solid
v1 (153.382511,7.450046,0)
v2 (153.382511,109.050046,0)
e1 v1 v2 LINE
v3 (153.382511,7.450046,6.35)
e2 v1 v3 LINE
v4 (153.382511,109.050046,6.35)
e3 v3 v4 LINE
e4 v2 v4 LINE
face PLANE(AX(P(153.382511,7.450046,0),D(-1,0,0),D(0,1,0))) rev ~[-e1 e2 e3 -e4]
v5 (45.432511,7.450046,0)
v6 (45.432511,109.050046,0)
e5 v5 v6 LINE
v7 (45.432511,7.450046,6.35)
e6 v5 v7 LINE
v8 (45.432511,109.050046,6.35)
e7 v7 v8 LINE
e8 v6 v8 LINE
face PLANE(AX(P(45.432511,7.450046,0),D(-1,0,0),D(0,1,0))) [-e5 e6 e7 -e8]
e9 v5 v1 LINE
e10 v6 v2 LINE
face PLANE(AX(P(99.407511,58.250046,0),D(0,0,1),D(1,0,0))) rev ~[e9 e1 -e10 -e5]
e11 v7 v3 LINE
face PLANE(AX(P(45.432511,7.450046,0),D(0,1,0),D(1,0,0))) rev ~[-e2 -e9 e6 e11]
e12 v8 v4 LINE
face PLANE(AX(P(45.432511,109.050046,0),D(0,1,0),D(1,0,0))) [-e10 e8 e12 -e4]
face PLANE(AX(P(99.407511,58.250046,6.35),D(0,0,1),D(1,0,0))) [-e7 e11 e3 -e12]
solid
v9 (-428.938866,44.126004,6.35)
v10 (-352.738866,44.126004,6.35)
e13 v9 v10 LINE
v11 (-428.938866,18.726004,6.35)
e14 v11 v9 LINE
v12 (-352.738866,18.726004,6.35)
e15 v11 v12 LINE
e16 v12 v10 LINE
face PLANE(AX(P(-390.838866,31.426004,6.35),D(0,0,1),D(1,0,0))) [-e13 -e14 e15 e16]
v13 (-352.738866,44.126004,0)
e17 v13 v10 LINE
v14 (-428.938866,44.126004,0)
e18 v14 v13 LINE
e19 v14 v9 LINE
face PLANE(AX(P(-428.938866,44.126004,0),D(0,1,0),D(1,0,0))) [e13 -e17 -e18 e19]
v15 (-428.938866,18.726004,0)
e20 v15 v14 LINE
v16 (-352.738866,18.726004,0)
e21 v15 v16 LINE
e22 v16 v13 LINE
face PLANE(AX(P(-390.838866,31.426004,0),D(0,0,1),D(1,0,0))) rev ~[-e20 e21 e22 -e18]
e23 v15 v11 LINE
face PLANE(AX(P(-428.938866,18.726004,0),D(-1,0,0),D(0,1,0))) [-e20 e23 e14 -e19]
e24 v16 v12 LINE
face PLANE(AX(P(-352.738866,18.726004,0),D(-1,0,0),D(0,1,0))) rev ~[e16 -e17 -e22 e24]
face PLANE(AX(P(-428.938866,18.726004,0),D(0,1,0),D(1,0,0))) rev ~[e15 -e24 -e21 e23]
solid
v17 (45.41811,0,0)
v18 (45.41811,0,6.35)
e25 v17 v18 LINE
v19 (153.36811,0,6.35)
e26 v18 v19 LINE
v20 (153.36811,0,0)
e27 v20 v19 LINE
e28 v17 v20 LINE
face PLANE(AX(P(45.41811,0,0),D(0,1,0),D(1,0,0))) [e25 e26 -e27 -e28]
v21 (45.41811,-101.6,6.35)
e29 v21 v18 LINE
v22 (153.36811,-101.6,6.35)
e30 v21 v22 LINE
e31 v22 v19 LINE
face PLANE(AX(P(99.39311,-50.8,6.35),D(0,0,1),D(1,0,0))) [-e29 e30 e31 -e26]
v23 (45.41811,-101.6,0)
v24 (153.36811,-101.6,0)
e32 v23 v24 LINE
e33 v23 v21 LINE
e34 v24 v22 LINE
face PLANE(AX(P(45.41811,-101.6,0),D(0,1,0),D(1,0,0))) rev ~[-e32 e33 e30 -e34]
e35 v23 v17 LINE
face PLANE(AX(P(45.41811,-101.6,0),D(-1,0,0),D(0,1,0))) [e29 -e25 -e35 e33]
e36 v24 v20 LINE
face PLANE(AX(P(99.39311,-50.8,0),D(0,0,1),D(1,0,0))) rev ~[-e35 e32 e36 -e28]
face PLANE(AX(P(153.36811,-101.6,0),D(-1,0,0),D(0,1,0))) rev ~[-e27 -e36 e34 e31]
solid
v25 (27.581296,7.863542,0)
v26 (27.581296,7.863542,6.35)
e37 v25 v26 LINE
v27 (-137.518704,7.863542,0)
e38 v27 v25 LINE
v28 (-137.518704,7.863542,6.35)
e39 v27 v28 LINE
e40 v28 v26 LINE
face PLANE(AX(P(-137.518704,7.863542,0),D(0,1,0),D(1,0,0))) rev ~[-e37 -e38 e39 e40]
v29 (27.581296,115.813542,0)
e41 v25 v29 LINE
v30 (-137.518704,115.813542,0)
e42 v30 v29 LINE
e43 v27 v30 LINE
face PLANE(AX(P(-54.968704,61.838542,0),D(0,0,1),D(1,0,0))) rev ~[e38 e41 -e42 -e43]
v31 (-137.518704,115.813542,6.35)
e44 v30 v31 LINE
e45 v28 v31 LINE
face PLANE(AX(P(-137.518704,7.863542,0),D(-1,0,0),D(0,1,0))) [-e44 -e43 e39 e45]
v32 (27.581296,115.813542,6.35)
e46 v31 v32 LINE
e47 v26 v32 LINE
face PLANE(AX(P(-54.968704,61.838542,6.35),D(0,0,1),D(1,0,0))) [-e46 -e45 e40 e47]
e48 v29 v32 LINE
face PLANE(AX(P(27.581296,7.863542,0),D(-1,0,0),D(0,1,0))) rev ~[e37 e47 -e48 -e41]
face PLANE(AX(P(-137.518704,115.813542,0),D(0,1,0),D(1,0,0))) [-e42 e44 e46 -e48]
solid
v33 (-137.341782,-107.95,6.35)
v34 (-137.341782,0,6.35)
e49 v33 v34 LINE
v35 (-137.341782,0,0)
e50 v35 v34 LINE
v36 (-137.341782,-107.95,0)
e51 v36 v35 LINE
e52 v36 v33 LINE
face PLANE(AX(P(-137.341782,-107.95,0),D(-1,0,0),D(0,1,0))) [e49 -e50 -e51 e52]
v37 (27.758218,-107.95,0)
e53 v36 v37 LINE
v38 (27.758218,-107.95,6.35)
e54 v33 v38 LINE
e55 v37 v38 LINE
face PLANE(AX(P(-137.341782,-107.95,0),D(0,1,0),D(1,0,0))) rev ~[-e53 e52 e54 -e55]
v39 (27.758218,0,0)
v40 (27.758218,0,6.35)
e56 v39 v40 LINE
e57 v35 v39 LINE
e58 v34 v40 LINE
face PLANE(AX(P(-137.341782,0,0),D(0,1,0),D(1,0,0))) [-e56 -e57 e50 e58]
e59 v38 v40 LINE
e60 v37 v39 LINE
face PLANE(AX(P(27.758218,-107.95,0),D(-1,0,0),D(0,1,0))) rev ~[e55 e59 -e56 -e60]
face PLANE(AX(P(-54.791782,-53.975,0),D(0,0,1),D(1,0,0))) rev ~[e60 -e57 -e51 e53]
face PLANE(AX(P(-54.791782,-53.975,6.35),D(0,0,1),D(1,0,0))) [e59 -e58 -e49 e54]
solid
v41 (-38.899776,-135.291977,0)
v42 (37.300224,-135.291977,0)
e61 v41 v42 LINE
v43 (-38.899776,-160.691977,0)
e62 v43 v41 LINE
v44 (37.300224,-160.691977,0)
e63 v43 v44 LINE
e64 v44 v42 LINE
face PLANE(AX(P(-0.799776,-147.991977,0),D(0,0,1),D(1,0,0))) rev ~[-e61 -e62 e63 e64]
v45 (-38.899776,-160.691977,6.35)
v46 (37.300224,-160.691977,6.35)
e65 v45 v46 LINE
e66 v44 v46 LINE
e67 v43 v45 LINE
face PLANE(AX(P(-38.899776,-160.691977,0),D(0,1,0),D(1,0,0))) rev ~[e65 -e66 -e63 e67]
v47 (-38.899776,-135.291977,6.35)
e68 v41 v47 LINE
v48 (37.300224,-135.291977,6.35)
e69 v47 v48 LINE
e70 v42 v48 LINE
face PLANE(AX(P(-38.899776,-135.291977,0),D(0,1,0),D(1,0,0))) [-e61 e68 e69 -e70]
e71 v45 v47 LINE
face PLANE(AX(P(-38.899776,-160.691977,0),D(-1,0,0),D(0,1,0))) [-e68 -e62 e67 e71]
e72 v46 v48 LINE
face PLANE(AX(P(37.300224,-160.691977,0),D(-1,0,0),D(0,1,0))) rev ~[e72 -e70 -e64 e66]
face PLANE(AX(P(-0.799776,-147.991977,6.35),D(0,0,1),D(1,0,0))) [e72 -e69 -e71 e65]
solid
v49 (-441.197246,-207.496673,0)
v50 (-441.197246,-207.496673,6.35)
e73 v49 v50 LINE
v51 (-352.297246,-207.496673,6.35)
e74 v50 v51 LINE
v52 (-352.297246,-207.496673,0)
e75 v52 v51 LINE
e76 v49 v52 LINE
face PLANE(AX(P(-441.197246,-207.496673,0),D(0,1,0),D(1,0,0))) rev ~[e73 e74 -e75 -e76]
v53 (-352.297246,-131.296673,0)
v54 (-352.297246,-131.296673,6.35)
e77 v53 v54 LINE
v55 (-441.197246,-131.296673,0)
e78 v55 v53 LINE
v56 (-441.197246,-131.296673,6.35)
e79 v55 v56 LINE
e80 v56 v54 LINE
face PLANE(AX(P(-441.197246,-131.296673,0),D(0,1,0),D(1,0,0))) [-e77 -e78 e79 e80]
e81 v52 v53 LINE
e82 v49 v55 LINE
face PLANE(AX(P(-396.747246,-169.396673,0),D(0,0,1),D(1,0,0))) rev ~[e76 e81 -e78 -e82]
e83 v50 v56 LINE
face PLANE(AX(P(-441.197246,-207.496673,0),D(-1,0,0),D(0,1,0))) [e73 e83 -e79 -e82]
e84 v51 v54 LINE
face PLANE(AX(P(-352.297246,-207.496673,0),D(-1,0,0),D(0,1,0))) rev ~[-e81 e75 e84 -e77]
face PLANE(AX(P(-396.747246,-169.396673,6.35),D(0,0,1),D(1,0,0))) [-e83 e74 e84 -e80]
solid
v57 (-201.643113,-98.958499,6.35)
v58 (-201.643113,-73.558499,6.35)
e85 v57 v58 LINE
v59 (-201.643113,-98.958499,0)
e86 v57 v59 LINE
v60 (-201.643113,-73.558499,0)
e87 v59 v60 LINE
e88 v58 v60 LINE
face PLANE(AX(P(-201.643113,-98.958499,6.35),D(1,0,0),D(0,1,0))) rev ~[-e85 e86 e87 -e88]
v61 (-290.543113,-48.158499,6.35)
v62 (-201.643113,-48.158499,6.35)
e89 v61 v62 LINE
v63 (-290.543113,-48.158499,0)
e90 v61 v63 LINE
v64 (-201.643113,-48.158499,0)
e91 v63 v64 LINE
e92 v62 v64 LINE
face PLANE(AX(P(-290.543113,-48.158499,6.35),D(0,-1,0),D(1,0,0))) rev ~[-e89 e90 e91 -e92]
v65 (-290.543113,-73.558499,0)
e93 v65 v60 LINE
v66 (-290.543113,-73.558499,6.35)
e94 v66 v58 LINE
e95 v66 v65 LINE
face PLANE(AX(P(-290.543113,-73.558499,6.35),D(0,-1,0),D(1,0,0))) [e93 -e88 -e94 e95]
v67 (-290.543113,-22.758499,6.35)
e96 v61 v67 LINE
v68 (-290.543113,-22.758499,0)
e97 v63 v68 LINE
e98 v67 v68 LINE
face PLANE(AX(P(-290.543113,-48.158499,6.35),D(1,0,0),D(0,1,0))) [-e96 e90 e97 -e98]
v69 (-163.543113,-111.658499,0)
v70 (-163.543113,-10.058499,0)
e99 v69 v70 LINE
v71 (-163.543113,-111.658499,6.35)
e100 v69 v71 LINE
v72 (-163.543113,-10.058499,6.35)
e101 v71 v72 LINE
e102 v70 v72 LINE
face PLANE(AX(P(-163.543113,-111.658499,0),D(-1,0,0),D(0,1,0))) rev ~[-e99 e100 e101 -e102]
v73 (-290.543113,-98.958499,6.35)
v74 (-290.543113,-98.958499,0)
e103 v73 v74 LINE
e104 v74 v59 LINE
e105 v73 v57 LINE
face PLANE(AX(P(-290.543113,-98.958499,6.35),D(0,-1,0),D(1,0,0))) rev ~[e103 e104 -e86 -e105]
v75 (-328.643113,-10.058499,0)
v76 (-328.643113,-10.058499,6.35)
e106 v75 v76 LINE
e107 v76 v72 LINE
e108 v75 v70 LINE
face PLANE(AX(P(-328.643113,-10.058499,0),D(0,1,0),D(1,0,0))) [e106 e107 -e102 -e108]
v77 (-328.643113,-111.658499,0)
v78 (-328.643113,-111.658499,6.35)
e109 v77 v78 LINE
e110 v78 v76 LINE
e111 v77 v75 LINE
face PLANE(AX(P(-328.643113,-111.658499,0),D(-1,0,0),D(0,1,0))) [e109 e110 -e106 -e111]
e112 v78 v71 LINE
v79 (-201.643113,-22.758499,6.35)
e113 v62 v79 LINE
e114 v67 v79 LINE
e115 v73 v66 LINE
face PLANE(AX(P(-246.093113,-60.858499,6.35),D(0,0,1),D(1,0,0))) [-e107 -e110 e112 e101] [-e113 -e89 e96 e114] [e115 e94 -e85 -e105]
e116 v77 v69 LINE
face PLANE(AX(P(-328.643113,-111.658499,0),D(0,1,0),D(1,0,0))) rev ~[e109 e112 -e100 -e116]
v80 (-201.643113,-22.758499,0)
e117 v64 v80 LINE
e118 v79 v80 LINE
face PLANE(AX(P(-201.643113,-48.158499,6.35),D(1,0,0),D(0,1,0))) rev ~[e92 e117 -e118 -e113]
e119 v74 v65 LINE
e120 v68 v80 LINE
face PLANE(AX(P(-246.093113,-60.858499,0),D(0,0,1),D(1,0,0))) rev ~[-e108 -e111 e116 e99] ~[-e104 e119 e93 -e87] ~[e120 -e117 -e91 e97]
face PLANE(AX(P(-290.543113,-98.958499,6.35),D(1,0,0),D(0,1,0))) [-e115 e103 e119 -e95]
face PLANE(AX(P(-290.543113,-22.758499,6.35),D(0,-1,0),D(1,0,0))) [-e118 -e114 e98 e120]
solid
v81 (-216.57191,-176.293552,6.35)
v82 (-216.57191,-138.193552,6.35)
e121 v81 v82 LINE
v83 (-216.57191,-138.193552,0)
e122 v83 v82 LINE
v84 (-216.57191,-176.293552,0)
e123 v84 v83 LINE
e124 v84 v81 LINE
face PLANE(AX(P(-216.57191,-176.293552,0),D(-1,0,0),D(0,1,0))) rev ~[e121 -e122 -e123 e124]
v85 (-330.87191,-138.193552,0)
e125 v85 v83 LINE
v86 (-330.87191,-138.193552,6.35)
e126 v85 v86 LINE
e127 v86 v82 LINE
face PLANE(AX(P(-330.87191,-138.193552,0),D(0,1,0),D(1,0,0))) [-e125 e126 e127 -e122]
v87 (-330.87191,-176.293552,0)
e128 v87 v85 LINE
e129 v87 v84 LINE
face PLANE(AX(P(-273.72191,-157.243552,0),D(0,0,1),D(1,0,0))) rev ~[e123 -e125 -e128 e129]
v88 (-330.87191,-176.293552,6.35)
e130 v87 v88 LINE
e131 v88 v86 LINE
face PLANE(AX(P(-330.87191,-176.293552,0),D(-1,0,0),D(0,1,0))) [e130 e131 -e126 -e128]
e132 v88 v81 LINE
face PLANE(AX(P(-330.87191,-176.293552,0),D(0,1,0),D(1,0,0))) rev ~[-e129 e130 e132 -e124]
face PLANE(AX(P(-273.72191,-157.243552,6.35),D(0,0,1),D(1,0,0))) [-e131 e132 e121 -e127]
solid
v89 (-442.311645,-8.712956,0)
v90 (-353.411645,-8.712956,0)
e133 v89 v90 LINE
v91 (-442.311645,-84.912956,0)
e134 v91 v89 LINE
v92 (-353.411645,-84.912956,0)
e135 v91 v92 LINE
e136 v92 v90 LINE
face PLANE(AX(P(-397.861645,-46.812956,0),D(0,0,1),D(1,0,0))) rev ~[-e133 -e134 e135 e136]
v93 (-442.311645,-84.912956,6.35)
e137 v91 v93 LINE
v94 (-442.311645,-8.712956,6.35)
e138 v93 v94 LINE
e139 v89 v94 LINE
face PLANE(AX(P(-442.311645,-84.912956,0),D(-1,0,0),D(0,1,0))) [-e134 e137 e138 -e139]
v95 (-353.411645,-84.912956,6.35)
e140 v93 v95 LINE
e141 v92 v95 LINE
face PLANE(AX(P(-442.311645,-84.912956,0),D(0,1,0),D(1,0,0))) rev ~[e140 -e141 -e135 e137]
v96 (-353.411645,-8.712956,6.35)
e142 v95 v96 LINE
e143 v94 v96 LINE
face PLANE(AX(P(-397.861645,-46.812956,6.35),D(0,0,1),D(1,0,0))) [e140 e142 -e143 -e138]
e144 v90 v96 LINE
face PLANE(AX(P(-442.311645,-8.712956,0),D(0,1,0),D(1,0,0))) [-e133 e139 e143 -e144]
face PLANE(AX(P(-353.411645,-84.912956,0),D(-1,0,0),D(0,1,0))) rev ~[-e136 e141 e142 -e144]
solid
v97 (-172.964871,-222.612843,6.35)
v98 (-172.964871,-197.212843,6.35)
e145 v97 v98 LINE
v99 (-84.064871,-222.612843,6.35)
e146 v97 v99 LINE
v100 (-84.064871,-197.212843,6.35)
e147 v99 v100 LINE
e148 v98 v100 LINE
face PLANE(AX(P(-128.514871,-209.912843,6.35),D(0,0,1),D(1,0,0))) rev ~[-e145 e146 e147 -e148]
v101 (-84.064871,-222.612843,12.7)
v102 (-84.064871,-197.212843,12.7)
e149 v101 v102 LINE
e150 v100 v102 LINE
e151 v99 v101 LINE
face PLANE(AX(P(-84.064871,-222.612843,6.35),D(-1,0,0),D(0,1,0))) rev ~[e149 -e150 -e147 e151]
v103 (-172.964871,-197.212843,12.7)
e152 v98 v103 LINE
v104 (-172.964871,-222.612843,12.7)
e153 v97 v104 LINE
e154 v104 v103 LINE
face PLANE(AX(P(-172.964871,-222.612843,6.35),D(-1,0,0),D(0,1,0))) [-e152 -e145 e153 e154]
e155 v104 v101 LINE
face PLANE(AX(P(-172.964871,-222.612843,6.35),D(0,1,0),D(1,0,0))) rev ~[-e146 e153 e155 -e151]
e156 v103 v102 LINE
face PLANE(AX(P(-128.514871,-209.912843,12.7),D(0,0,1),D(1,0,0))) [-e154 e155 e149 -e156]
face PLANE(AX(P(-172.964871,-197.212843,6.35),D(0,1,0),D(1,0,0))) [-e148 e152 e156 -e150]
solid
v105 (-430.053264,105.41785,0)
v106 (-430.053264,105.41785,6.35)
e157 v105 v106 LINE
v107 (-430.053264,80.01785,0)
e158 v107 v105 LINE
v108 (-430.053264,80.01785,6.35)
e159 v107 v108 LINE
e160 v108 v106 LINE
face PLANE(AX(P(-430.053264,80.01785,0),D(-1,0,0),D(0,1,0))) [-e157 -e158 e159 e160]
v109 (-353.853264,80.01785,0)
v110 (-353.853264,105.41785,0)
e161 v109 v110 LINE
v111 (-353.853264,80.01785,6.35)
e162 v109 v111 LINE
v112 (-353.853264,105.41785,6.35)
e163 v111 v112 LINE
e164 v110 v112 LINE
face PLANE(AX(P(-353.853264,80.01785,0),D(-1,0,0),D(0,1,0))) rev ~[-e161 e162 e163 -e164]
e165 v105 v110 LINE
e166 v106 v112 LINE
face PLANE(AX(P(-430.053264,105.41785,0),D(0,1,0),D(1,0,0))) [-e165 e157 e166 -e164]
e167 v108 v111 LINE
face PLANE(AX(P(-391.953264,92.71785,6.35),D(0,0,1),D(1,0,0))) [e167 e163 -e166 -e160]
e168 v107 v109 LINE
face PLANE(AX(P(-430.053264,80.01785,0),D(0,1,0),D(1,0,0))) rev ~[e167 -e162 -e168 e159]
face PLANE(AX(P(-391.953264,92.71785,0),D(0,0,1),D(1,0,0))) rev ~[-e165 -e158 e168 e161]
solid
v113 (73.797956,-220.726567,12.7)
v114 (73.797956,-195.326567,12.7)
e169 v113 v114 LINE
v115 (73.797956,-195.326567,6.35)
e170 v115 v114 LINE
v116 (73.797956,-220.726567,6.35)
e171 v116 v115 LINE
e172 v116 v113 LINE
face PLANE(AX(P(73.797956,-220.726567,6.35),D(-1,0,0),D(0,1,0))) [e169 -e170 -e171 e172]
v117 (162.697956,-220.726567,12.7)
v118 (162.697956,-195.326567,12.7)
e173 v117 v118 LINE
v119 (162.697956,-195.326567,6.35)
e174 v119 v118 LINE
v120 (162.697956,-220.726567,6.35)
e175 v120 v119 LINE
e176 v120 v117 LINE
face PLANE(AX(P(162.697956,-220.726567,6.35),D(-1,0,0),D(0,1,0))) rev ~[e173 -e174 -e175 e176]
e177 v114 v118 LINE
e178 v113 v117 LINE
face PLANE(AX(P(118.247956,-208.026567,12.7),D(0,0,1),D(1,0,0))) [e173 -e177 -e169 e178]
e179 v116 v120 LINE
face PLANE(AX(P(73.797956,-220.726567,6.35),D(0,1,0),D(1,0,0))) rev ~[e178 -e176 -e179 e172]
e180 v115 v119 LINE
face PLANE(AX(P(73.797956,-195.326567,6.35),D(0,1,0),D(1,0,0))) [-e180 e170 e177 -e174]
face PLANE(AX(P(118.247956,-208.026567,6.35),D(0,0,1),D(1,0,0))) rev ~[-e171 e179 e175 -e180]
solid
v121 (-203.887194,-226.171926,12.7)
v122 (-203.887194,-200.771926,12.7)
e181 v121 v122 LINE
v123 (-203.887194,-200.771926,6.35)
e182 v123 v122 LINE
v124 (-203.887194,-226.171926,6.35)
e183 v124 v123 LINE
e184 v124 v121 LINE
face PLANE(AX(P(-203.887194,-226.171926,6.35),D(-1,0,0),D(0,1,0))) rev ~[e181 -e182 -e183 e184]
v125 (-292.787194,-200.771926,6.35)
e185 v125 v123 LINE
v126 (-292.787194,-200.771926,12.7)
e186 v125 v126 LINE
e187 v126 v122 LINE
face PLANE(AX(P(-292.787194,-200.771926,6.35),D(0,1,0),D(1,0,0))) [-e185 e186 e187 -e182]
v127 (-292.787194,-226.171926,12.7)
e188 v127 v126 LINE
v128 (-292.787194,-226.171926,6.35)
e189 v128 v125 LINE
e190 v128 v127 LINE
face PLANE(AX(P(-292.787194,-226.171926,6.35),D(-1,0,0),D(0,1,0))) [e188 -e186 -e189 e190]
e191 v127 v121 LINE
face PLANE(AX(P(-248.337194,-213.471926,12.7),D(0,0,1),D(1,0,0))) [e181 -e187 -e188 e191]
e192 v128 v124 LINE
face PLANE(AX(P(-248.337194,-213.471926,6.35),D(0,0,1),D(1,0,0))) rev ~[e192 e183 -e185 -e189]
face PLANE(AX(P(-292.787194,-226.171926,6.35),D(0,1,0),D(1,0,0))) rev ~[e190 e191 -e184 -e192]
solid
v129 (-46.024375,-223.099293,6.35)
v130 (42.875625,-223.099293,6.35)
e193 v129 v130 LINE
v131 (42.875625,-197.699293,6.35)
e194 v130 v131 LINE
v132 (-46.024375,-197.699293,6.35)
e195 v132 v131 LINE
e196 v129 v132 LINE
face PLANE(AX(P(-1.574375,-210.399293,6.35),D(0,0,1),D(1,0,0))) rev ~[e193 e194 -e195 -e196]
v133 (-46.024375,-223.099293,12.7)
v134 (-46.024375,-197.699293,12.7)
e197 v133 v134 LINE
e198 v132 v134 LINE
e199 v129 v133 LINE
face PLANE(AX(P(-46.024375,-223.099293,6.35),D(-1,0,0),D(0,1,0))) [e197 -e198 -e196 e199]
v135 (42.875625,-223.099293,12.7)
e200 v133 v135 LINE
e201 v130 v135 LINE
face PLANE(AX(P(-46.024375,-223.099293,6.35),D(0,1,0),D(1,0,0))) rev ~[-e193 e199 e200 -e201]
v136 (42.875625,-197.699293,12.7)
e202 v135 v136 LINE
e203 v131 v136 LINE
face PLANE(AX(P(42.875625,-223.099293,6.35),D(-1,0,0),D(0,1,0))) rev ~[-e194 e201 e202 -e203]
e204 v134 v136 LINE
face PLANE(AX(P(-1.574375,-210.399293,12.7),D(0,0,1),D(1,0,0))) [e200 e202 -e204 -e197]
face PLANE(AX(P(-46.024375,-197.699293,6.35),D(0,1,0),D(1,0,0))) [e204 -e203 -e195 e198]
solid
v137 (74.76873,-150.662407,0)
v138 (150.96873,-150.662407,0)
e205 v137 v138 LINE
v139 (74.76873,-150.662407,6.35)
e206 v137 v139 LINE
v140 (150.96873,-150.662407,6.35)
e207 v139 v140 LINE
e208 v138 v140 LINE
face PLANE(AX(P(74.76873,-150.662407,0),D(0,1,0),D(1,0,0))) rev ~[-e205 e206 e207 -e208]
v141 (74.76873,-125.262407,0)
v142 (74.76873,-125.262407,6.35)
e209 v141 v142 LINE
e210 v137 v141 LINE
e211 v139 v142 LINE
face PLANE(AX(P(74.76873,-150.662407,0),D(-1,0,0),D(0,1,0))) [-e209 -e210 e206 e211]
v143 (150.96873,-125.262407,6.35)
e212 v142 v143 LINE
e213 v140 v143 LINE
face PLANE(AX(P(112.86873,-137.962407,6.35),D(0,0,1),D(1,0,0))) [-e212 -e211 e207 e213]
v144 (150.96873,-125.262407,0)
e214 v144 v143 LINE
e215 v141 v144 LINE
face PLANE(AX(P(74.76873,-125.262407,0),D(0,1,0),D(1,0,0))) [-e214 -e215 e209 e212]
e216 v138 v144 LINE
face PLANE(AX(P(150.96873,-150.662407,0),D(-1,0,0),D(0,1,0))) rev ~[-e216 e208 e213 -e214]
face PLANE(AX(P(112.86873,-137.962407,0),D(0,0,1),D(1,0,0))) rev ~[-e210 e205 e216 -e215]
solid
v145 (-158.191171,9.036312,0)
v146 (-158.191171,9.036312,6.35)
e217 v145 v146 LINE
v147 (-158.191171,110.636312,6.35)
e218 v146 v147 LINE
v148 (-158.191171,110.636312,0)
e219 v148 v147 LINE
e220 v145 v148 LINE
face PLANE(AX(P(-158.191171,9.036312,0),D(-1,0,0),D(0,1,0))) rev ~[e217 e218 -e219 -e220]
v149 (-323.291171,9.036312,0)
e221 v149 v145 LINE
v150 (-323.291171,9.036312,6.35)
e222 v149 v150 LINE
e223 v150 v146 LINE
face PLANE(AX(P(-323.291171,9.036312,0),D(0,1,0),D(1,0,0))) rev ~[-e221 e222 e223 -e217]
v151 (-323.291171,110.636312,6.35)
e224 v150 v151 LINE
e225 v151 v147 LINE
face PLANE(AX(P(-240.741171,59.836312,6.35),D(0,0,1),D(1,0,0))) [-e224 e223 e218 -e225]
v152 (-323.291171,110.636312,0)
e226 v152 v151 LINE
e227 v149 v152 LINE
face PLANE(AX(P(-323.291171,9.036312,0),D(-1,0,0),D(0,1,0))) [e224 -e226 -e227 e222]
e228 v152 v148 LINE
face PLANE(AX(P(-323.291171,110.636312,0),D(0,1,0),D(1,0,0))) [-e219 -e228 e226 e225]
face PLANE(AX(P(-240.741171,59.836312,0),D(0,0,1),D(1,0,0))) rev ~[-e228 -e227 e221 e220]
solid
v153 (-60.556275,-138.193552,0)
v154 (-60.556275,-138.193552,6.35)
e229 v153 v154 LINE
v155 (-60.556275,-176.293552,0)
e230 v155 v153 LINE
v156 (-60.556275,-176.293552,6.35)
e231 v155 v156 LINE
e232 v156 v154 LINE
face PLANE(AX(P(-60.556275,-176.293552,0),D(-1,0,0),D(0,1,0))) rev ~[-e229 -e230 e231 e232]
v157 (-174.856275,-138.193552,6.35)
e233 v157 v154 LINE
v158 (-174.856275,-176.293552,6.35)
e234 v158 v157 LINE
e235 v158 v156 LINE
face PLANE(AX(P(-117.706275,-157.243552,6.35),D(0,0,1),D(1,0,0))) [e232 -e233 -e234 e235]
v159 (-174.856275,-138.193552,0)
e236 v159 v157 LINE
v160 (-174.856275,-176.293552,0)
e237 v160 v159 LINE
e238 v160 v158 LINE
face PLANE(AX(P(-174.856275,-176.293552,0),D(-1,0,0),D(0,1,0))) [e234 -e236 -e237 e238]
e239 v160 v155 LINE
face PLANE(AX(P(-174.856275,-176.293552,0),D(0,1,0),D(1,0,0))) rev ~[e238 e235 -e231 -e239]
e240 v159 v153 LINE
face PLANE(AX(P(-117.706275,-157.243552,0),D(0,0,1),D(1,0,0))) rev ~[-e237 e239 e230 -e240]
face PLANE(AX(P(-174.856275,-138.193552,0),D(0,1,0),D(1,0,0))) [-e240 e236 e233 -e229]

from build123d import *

# Parameters (mm, degrees)
F1_W      = 165.1
F1_H      = 107.95
F7_DEPTH  = 6.35
F2_W      = 165.1
F2_H      = 107.95
F3_W      = 107.95
F3_H      = 101.6
F4_W      = 107.95
F4_H      = 101.6
F5_W      = 165.1
F5_H      = 101.6
F6_W      = 165.1
F6_H      = 101.6
F8_W      = 88.9
F8_H      = 25.4
F9_DEPTH  = 6.351
F10_W     = 114.3
F10_H     = 38.1
F15_DEPTH = 6.35
F11_W     = 76.2
F11_H     = 25.4
F12_W     = 76.2
F12_H     = 25.4
F13_W     = 88.9
F13_H     = 76.2
F14_W     = 88.9
F14_H     = 25.4


# Not quite as in the source:
# - a variable given as a bare number and used for a length is read in inches; the dataset says mm whatever the document's units were


with BuildPart() as f7:
    # F1 (on Top) → F7 (new body)
    with BuildSketch(Plane.XY):
        with Locations((-54.9687035382, 61.838542049)):
            Rectangle(F1_W, F1_H)
    extrude(amount=F7_DEPTH)


with BuildPart() as f7b:
    # F2 (on Top) → F7, piece 2 (new body)
    with BuildSketch(Plane.XY):
        with Locations((-54.7917824507, -53.975)):
            Rectangle(F2_W, F2_H)
    extrude(amount=F7_DEPTH)


with BuildPart() as f7c:
    # F3 (on Top) → F7, piece 3 (new body)
    with BuildSketch(Plane.XY):
        with Locations((99.4075111032, 58.2500463382)):
            Rectangle(F3_W, F3_H)
    extrude(amount=F7_DEPTH)


with BuildPart() as f7d:
    # F4 (on Top) → F7, piece 4 (new body)
    with BuildSketch(Plane.XY):
        with Locations((99.3931097448, -50.8)):
            Rectangle(F4_W, F4_H)
    extrude(amount=F7_DEPTH)


with BuildPart() as f7e:
    # F5 (on Top) → F7, piece 5 (new body)
    with BuildSketch(Plane.XY):
        with Locations((-246.0931133747, -60.8584986448)):
            Rectangle(F5_W, F5_H)
    extrude(amount=F7_DEPTH)

    # F8 (on face) → F9 (cut, through all)
    with BuildSketch(Plane.XY.offset(6.35)):
        with Locations((-246.0931133747, -86.2584986448)):
            Rectangle(F8_W, F8_H)
        with Locations((-246.0931133747, -35.4584986448)):
            Rectangle(F8_W, F8_H)
    extrude(amount=-F9_DEPTH, mode=Mode.SUBTRACT)


with BuildPart() as f7f:
    # F6 (on Top) → F7, piece 6 (new body)
    with BuildSketch(Plane.XY):
        with Locations((-240.7411709428, 59.8363118468)):
            Rectangle(F6_W, F6_H)
    extrude(amount=F7_DEPTH)


with BuildPart() as f15:
    # F10 (on Top) → F15 (new body)
    with BuildSketch(Plane.XY):
        with Locations((-117.7062753201, -157.2435519218)):
            Rectangle(F10_W, F10_H)
    extrude(amount=F15_DEPTH)


with BuildPart() as f15b:
    # F10 (on Top) → F15, piece 2 (new body)
    with BuildSketch(Plane.XY):
        with Locations((-273.7219098568, -157.2435519218)):
            Rectangle(F10_W, F10_H)
    extrude(amount=F15_DEPTH)


with BuildPart() as f15c:
    # F11 (on Top) → F15, piece 3 (new body)
    with BuildSketch(Plane.XY):
        with Locations((-0.7997755945, -147.9919765472)):
            Rectangle(F11_W, F11_H)
    extrude(amount=F15_DEPTH)


with BuildPart() as f15d:
    # F11 (on Top) → F15, piece 4 (new body)
    with BuildSketch(Plane.XY):
        with Locations((112.8687295079, -137.962407279)):
            Rectangle(F11_W, F11_H)
    extrude(amount=F15_DEPTH)


with BuildPart() as f15e:
    # F12 (on Top) → F15, piece 5 (new body)
    with BuildSketch(Plane.XY):
        with Locations((-390.8388656616, 31.4260042876)):
            Rectangle(F12_W, F12_H)
    extrude(amount=F15_DEPTH)


with BuildPart() as f15f:
    # F12 (on Top) → F15, piece 6 (new body)
    with BuildSketch(Plane.XY):
        with Locations((-391.9532639027, 92.717849803)):
            Rectangle(F12_W, F12_H)
    extrude(amount=F15_DEPTH)


with BuildPart() as f15g:
    # F13 (on Top) → F15, piece 7 (new body)
    with BuildSketch(Plane.XY):
        with Locations((-397.8616445541, -46.812955761)):
            Rectangle(F13_W, F13_H)
    extrude(amount=F15_DEPTH)


with BuildPart() as f15h:
    # F13 (on Top) → F15, piece 8 (new body)
    with BuildSketch(Plane.XY):
        with Locations((-396.7472463131, -169.3966728687)):
            Rectangle(F13_W, F13_H)
    extrude(amount=F15_DEPTH)


with BuildPart() as f15i:
    # F14 (on face) → F15, piece 9 (new body)
    with BuildSketch(Plane.XY.offset(6.35)):
        with Locations((-1.5743746638, -210.3992934942)):
            Rectangle(F14_W, F14_H)
    extrude(amount=F15_DEPTH)


with BuildPart() as f15j:
    # F14 (on face) → F15, piece 10 (new body)
    with BuildSketch(Plane.XY.offset(6.35)):
        with Locations((-128.5148709297, -209.9128429174)):
            Rectangle(F14_W, F14_H)
    extrude(amount=F15_DEPTH)


with BuildPart() as f15k:
    # F14 (on face) → F15, piece 11 (new body)
    with BuildSketch(Plane.XY.offset(6.35)):
        with Locations((-248.337194252, -213.4719256639)):
            Rectangle(F14_W, F14_H)
    extrude(amount=F15_DEPTH)


with BuildPart() as f15l:
    # F14 (on face) → F15, piece 12 (new body)
    with BuildSketch(Plane.XY.offset(6.35)):
        with Locations((118.247956109, -208.0265666962)):
            Rectangle(F14_W, F14_H)
    extrude(amount=F15_DEPTH)


solid = Compound([f7.part, f7b.part, f7c.part, f7d.part, f7e.part, f7f.part, f15.part, f15b.part, f15c.part, f15d.part, f15e.part, f15f.part, f15g.part, f15h.part, f15i.part, f15j.part, f15k.part, f15l.part])
